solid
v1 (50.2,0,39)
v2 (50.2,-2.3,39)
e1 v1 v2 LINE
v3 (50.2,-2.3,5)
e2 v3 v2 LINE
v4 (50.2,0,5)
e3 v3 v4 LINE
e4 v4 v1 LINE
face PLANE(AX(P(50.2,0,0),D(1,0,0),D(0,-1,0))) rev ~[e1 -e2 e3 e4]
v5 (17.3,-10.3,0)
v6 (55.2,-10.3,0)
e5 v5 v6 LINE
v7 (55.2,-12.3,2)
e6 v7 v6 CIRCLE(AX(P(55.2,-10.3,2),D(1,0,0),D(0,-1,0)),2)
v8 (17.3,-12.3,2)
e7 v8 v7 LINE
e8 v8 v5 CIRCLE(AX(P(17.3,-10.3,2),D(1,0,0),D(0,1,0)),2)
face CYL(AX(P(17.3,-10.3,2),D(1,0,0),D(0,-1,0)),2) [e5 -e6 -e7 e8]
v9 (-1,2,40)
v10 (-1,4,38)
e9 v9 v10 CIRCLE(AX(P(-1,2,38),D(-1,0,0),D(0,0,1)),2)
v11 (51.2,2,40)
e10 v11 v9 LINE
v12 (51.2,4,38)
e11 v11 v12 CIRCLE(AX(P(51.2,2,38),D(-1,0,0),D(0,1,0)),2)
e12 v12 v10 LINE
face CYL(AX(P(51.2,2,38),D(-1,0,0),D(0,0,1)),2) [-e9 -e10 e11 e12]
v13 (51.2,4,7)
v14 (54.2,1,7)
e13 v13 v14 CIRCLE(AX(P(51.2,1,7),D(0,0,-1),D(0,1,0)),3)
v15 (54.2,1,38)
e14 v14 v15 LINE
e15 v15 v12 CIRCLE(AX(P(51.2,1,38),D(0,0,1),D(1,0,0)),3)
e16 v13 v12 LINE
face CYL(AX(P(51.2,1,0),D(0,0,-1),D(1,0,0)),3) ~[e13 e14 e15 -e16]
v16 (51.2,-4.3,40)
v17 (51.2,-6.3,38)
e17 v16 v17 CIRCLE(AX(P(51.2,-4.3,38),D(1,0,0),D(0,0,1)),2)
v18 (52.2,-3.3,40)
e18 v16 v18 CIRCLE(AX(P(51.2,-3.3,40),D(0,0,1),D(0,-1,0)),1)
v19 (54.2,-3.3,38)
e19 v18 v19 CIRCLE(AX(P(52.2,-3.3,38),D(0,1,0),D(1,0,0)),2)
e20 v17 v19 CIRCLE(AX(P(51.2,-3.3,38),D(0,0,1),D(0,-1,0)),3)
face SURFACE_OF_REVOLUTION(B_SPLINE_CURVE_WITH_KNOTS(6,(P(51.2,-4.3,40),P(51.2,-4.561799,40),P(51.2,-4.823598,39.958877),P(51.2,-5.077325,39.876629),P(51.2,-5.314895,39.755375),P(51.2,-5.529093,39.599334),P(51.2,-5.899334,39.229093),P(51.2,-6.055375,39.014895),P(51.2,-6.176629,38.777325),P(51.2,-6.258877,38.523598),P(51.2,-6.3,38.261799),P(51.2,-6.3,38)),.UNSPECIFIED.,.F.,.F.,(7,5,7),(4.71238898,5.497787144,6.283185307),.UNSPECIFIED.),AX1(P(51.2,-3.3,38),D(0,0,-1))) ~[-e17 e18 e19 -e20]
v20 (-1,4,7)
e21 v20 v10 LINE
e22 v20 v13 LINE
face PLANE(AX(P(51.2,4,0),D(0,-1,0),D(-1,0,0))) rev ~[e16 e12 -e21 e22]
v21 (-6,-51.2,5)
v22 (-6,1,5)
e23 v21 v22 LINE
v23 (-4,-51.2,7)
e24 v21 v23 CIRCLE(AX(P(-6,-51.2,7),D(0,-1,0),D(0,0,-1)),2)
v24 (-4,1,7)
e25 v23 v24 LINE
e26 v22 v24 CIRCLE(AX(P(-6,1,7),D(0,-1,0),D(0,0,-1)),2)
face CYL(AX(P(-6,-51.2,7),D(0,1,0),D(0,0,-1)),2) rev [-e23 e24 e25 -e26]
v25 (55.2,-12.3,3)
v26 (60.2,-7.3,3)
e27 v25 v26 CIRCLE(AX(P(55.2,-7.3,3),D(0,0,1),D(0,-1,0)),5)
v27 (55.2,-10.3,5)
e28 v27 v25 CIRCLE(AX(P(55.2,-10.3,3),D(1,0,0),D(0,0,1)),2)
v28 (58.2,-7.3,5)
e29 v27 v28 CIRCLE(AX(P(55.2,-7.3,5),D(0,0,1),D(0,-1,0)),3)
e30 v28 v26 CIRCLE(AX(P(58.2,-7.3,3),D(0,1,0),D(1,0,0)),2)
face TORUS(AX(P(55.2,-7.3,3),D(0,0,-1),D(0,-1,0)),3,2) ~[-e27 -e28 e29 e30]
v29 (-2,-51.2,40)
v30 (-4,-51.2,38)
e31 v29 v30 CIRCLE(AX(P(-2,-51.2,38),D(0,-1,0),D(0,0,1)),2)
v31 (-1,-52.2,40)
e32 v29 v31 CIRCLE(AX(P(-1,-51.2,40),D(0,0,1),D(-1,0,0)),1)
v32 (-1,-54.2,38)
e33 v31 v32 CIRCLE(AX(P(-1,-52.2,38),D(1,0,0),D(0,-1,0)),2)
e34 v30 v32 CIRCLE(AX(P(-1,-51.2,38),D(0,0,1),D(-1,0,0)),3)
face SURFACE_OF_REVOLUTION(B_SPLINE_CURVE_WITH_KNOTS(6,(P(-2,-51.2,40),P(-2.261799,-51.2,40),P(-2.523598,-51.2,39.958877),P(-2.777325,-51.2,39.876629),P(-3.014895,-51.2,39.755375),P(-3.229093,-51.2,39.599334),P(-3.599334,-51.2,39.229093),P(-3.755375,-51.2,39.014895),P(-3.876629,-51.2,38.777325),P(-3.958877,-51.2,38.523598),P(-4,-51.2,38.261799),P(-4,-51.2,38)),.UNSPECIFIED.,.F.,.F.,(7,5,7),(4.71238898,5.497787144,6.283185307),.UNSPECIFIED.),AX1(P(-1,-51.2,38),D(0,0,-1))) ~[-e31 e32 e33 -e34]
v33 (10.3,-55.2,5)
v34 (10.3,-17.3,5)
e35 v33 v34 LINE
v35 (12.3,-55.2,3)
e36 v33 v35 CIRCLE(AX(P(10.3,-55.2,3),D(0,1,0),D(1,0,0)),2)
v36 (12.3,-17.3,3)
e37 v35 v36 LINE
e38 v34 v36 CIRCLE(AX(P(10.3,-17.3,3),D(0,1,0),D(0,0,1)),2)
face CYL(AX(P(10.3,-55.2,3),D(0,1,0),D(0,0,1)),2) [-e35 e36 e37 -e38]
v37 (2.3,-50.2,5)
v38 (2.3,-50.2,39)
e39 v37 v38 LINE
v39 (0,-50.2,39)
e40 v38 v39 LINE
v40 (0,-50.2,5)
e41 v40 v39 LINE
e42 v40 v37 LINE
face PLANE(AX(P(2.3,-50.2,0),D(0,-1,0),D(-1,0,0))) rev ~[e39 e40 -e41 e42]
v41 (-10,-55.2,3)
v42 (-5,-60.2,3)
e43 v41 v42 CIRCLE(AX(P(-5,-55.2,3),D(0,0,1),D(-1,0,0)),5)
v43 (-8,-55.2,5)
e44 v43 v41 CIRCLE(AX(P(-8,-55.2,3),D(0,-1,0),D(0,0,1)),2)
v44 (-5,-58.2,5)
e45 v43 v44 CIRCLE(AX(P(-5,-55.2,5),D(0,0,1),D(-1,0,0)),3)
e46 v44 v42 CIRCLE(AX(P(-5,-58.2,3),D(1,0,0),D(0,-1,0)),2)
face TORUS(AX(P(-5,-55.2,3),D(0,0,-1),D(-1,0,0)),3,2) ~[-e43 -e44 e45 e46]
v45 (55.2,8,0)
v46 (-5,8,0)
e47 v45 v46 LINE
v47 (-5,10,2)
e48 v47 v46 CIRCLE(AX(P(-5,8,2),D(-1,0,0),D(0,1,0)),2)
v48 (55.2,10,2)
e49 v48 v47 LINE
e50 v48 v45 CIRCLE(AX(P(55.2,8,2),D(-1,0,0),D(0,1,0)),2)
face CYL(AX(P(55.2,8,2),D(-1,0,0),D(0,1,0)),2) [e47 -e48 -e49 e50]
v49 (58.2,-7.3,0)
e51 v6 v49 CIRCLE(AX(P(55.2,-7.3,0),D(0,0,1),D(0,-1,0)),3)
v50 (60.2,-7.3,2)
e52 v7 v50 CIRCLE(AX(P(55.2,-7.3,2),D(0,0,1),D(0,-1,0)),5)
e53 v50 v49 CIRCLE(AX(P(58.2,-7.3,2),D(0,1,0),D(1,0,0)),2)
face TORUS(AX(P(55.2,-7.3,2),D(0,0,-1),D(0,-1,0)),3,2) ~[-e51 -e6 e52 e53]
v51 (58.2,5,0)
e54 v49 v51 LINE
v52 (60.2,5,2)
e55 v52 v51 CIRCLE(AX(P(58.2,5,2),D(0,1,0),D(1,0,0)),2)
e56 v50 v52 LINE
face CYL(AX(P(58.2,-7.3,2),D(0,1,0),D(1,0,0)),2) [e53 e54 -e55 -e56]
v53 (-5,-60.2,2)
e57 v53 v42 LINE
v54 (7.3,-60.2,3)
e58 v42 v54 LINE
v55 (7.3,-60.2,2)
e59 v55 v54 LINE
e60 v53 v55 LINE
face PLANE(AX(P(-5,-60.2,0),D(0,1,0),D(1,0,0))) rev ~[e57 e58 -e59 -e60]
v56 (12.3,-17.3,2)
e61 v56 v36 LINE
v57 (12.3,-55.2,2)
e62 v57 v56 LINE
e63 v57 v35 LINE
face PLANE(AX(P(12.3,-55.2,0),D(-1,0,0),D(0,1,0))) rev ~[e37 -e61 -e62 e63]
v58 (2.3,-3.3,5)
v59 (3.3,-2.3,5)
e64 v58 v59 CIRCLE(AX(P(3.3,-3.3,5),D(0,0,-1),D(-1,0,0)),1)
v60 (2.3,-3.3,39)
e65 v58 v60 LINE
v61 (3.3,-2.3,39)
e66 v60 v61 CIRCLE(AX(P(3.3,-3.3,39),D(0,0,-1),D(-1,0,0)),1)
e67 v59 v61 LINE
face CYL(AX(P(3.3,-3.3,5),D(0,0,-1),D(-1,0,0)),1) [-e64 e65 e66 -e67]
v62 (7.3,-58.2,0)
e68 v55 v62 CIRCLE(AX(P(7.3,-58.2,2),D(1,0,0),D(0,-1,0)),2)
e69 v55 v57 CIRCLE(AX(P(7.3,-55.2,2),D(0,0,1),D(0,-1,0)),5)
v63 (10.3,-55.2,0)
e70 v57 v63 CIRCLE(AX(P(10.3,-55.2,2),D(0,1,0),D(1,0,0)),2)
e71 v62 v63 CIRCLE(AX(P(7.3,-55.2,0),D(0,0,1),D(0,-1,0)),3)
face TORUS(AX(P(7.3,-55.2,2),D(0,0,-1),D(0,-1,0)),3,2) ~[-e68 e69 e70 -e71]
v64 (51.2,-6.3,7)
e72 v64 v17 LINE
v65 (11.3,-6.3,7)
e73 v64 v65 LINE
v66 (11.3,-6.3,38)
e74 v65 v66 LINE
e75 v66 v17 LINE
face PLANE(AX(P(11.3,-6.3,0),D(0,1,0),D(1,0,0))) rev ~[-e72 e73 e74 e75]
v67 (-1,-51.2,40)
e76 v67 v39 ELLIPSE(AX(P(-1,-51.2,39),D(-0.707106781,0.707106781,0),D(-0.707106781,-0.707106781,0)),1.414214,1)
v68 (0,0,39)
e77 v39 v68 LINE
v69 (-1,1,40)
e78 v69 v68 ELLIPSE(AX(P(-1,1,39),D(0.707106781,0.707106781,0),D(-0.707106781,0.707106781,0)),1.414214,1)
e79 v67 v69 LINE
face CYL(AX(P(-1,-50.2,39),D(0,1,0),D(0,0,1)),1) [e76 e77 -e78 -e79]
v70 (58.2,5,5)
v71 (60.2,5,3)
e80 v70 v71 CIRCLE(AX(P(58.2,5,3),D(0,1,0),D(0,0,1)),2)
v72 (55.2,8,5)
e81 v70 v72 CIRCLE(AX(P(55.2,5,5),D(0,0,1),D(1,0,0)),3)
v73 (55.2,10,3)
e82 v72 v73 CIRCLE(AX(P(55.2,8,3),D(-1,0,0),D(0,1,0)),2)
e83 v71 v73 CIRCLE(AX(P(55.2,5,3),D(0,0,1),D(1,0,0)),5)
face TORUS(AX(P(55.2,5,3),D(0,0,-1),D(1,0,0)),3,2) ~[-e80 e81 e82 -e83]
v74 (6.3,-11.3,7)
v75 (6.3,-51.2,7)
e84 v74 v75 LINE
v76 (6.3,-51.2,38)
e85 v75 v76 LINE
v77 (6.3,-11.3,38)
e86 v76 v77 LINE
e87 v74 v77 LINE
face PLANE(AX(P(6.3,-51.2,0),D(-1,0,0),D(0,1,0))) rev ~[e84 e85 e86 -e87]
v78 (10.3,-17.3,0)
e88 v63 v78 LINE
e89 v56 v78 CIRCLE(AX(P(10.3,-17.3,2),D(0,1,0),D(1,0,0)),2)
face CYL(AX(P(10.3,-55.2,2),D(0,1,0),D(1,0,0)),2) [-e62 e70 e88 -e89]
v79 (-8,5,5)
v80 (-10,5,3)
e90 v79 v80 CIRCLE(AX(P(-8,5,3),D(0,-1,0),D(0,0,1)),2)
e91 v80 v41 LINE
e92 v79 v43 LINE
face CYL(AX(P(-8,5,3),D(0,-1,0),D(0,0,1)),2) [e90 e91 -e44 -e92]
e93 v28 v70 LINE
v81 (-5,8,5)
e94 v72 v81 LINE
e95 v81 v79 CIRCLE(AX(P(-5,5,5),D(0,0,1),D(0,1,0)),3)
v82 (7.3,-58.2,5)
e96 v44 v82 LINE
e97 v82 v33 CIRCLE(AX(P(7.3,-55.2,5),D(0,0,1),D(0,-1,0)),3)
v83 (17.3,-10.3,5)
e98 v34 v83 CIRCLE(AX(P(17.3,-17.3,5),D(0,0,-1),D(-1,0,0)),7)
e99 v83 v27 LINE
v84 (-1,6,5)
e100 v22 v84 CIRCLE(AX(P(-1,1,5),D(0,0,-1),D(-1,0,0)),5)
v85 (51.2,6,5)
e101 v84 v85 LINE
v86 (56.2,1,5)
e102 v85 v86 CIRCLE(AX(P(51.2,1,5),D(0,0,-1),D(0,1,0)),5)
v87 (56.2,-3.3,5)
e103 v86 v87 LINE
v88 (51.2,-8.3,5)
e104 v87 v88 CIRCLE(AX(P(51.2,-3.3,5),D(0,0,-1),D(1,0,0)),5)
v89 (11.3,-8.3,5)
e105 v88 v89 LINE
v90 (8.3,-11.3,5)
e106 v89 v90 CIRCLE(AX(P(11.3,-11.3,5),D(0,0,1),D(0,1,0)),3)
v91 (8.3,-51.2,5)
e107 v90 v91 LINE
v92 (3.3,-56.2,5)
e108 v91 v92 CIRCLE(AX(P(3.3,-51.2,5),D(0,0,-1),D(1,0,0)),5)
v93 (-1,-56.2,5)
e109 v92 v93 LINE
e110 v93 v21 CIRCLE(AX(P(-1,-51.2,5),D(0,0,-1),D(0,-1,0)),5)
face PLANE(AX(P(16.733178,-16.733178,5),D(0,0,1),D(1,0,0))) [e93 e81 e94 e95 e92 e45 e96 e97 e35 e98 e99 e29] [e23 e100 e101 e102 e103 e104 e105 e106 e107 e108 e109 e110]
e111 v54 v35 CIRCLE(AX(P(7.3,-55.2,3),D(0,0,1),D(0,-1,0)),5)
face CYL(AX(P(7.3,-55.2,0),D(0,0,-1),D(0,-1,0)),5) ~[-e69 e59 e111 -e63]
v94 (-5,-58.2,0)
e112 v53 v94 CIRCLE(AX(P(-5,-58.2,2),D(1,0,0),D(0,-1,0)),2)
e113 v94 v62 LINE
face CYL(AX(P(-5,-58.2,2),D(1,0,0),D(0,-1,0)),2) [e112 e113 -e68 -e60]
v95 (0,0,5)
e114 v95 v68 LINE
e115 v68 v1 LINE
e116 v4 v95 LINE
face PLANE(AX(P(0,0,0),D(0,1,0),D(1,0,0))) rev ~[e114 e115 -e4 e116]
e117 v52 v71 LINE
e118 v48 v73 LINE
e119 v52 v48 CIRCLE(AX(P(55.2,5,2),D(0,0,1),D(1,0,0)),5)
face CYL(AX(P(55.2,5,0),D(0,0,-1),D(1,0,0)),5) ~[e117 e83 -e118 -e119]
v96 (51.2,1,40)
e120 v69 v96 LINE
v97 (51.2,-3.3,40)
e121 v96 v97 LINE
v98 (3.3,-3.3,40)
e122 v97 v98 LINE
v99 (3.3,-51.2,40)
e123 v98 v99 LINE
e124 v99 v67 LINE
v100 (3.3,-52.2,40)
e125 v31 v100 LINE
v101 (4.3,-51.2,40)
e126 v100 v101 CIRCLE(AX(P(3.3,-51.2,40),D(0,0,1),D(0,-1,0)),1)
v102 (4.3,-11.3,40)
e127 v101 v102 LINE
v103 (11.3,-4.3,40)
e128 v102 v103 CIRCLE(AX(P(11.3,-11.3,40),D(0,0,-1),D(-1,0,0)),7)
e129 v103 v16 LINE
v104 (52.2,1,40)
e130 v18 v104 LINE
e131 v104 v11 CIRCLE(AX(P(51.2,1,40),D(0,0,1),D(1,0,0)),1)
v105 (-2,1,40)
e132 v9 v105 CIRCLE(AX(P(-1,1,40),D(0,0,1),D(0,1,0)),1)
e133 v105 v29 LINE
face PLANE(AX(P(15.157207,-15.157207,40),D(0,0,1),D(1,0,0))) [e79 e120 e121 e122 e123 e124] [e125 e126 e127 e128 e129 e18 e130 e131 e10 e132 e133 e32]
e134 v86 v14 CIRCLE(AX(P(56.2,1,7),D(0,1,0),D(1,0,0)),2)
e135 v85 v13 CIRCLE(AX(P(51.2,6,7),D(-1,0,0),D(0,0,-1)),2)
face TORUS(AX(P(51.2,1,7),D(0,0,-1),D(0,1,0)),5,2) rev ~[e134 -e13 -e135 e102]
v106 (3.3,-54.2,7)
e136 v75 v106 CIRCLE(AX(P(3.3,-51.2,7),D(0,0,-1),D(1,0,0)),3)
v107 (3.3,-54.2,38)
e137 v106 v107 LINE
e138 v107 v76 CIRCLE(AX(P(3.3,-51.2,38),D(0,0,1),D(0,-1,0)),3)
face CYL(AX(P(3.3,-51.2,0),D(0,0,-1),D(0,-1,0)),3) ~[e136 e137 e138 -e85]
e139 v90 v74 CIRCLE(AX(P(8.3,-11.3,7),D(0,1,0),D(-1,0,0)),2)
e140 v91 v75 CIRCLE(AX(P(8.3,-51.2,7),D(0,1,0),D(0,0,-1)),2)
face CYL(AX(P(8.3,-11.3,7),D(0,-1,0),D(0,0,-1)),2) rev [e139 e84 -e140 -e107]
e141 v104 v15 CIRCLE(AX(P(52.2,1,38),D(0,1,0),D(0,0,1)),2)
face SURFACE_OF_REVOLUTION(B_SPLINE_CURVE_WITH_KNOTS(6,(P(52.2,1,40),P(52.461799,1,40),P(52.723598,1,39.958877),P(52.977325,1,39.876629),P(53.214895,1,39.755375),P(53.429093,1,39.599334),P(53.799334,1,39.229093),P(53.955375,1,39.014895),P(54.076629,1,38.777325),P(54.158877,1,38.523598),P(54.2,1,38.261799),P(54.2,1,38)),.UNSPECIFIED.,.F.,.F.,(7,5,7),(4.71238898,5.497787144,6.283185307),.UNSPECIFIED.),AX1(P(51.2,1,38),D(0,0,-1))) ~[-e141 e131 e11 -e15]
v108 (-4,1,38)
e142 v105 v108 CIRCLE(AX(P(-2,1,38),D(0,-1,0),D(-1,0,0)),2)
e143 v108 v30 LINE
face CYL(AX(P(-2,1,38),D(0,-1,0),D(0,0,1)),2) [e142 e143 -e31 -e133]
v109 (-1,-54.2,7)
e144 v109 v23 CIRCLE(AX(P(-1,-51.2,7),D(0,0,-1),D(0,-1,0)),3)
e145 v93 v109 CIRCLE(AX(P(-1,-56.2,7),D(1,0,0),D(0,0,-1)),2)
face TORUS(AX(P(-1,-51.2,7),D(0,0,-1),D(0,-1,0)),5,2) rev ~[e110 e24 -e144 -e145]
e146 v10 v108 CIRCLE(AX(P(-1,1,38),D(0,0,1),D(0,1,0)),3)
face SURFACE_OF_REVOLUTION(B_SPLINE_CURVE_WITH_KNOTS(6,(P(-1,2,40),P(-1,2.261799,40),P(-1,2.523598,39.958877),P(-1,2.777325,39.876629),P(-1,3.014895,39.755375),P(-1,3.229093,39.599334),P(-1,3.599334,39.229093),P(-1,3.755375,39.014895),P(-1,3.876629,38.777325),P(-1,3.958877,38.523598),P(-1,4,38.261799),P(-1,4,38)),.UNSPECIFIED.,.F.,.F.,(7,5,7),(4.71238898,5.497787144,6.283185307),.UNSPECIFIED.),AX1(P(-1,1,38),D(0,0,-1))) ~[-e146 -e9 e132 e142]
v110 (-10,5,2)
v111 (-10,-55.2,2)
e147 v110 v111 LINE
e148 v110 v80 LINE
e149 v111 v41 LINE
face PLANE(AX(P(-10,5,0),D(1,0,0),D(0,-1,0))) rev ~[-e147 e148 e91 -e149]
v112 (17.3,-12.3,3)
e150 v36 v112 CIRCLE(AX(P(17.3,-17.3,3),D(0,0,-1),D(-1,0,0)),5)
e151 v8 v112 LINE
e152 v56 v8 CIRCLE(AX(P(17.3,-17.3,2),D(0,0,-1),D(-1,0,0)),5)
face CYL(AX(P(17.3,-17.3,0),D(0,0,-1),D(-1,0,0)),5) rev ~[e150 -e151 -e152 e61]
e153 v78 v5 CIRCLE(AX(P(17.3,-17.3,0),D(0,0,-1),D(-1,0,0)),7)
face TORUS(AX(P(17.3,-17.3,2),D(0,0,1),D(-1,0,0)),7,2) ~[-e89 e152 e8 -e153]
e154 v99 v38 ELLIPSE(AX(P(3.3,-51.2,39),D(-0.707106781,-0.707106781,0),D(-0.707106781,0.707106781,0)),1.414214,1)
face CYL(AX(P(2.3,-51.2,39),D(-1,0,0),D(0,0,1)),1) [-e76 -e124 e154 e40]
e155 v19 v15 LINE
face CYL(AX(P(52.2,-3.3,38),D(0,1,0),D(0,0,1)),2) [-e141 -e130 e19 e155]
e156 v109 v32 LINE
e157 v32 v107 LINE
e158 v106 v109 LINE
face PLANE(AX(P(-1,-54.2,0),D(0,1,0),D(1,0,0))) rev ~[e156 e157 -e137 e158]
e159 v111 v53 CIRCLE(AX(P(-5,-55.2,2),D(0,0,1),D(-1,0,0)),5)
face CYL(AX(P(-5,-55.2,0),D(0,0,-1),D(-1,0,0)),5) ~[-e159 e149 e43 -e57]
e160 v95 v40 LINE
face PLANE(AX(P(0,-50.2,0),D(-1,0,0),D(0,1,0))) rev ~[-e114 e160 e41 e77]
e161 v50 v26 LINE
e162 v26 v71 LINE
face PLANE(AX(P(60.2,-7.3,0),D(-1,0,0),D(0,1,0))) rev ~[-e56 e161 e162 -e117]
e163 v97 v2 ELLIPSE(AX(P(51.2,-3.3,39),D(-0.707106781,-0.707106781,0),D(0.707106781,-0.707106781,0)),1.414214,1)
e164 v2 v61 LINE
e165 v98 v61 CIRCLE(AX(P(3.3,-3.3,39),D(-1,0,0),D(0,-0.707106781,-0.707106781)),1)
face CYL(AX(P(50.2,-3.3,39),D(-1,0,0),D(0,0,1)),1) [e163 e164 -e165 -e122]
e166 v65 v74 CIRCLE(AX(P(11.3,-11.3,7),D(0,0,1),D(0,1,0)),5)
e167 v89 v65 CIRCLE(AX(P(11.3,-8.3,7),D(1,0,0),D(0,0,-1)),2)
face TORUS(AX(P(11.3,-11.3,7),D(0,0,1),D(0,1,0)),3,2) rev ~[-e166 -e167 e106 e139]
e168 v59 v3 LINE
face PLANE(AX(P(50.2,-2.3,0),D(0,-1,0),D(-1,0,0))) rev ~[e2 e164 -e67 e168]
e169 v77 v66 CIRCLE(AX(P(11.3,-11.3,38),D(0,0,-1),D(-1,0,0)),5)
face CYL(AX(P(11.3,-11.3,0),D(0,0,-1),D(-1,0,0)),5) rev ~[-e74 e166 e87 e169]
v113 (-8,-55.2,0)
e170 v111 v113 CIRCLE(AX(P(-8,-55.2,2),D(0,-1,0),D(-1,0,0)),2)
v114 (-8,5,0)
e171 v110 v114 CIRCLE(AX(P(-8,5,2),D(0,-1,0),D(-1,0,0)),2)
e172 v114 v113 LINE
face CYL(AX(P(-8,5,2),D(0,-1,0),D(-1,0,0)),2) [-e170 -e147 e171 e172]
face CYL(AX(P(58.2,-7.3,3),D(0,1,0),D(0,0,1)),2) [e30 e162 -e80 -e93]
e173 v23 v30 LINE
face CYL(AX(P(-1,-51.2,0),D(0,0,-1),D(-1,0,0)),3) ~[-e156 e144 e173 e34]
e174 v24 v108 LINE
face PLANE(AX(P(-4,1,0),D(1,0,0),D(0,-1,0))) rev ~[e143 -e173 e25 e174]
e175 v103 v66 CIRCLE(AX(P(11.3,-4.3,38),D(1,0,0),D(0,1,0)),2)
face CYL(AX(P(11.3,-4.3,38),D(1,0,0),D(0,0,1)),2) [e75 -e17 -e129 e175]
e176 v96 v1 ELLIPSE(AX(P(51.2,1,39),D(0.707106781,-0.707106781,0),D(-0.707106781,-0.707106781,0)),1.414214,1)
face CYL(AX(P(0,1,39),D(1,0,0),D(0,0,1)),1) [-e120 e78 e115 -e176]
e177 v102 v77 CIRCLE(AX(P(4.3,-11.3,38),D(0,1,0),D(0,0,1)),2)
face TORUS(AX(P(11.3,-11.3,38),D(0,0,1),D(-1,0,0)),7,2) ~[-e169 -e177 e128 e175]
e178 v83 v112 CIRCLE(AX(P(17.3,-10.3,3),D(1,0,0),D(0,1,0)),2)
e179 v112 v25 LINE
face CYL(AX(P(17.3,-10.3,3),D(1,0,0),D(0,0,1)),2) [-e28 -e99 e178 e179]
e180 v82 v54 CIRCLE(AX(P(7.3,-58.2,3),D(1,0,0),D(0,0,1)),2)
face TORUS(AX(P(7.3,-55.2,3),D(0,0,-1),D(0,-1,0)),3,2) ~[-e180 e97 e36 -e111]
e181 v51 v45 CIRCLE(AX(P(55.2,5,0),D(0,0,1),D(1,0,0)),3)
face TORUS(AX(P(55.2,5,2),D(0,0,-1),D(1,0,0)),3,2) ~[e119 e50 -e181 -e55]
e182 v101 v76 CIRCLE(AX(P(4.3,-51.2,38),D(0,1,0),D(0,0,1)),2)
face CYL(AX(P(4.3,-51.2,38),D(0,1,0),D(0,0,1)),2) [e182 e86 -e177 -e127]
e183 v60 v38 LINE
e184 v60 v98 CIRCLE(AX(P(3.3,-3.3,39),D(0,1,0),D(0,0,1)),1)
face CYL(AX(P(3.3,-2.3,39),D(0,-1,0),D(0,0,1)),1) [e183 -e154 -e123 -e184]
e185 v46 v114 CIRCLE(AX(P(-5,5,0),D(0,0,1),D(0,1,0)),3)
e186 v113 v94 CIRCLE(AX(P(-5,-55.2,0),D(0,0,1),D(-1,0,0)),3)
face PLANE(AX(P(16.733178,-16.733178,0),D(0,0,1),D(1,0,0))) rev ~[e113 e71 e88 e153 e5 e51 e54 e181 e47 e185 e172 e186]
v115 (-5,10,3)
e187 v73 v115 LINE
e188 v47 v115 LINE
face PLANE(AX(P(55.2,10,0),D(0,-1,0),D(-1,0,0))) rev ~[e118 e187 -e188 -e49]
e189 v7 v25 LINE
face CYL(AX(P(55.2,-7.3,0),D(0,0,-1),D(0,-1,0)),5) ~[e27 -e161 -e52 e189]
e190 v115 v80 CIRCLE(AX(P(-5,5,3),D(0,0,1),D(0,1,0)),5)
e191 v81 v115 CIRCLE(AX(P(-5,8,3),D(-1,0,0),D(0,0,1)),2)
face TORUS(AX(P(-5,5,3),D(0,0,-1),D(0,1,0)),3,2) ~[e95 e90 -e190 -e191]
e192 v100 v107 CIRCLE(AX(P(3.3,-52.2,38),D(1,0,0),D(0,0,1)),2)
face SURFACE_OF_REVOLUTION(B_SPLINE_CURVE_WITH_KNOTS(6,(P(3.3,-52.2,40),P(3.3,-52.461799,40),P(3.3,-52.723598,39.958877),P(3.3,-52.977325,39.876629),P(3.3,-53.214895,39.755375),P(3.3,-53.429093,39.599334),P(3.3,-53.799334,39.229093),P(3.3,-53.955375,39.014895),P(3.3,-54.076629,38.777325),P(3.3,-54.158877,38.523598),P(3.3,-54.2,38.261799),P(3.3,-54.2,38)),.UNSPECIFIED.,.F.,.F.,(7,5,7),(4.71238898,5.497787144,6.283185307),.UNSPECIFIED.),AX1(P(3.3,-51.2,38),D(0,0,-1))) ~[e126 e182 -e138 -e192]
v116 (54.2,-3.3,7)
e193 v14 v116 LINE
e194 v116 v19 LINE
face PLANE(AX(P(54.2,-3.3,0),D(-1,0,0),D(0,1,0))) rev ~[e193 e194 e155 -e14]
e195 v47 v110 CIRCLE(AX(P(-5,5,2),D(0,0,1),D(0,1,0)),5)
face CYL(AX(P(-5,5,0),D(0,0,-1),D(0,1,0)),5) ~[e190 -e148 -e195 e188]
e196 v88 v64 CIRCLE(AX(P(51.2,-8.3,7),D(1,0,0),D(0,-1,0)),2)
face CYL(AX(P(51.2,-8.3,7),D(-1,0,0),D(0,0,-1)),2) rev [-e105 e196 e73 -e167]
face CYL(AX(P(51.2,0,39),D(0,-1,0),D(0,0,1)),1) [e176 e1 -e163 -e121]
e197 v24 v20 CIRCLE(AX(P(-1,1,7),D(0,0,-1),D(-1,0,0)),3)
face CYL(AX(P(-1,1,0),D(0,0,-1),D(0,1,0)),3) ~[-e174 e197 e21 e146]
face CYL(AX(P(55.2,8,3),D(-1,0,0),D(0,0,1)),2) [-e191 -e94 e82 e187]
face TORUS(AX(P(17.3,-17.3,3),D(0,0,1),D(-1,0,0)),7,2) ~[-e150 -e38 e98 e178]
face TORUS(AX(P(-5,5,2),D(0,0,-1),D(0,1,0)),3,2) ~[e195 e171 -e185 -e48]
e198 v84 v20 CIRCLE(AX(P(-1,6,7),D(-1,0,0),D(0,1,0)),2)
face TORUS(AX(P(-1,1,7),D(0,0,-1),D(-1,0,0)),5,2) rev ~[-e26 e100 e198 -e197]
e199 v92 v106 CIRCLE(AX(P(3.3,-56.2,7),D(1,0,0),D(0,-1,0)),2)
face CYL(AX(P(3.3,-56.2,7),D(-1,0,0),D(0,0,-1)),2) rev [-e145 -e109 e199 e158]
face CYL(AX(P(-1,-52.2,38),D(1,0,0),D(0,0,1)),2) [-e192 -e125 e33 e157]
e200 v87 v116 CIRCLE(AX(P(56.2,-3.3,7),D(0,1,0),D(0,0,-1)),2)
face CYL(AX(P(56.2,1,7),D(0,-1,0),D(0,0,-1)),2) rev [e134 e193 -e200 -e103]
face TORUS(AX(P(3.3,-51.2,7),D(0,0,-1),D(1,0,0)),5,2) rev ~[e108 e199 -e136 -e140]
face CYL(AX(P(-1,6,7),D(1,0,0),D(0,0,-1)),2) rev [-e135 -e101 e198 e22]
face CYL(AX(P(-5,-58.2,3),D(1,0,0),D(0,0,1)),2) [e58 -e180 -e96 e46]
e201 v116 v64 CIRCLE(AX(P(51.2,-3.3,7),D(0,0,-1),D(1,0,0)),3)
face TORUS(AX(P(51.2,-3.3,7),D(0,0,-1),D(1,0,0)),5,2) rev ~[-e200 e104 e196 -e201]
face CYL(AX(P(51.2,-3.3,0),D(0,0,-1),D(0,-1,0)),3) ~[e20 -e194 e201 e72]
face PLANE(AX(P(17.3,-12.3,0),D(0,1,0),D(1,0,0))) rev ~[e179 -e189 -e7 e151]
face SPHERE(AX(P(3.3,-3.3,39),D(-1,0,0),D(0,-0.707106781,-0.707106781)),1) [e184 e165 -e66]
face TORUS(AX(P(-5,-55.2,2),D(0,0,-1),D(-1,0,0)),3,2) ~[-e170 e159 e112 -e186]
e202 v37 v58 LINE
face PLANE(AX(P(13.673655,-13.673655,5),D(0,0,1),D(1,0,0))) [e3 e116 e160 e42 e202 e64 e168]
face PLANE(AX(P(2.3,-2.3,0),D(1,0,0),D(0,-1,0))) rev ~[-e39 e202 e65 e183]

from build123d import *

# Parameters (mm, degrees)
F1_DEPTH    = 5
F2_DEPTH    = 40
F3_R        = 2
F4_R        = 1
F5_T1_DEPTH = 34
F5_S5_W     = 1
F5_S5_H     = 1
F5_T6_DEPTH = 1


# Not quite as in the source:
# - a fillet or chamfer that OpenCascade refuses, or shapes differently, is made with other operations: its cross-section is extruded or revolved along the edge and cut away or added


with BuildPart() as f1:
    # F0 (on Top) → F1 (new body)
    with BuildSketch(Plane.XY):
        Polygon((50.2, 0), (0, 0), (0, -50.2), (2.3, -50.2), (2.3, -2.3), (50.2, -2.3), align=None)
    extrude(amount=F1_DEPTH)



with BuildPart() as f1b:
    # F0 (on Top) → F1, piece 2 (new body)
    with BuildSketch(Plane.XY):
        with BuildLine():
            Line((55.2, 10), (-5, 10))
            ThreePointArc((-5, 10), (-8.5355339059, 8.5355339059), (-10, 5))
            Line((-10, 5), (-10, -55.2))
            ThreePointArc((-10, -55.2), (-8.5355339059, -58.7355339059), (-5, -60.2))
            Line((-5, -60.2), (7.3, -60.2))
            ThreePointArc((7.3, -60.2), (10.8355339059, -58.7355339059), (12.3, -55.2))
            Line((12.3, -55.2), (12.3, -17.3))
            ThreePointArc((12.3, -17.3), (13.7644660941, -13.7644660941), (17.3, -12.3))
            Line((17.3, -12.3), (55.2, -12.3))
            ThreePointArc((55.2, -12.3), (58.7355339059, -10.8355339059), (60.2, -7.3))
            Line((60.2, -7.3), (60.2, 5))
            ThreePointArc((60.2, 5), (58.7355339059, 8.5355339059), (55.2, 10))
        make_face()
        with BuildLine():
            ThreePointArc((51.2, 4), (53.3213203436, 3.1213203436), (54.2, 1))
            Line((54.2, 1), (54.2, -3.3))
            ThreePointArc((54.2, -3.3), (53.3213203436, -5.4213203436), (51.2, -6.3))
            Line((51.2, -6.3), (11.3, -6.3))
            ThreePointArc((11.3, -6.3), (7.7644660941, -7.7644660941), (6.3, -11.3))
            Line((6.3, -11.3), (6.3, -51.2))
            ThreePointArc((6.3, -51.2), (5.4213203436, -53.3213203436), (3.3, -54.2))
            Line((3.3, -54.2), (-1, -54.2))
            ThreePointArc((-1, -54.2), (-3.1213203436, -53.3213203436), (-4, -51.2))
            Line((-4, -51.2), (-4, 1))
            ThreePointArc((-4, 1), (-3.1213203436, 3.1213203436), (-1, 4))
            Line((-1, 4), (51.2, 4))
        make_face(mode=Mode.SUBTRACT)
    extrude(amount=F1_DEPTH)


with BuildPart() as f1_1:
    add(f1.part)

    add(f1b.part)  # F2 merges F1b
    # F0 (on Top) → F2 (join)
    with BuildSketch(Plane.XY):
        with BuildLine():
            Line((54.2, -3.3), (54.2, 1))
            ThreePointArc((54.2, 1), (53.3213203436, 3.1213203436), (51.2, 4))
            Line((51.2, 4), (-1, 4))
            ThreePointArc((-1, 4), (-3.1213203436, 3.1213203436), (-4, 1))
            Line((-4, 1), (-4, -51.2))
            ThreePointArc((-4, -51.2), (-3.1213203436, -53.3213203436), (-1, -54.2))
            Line((-1, -54.2), (3.3, -54.2))
            ThreePointArc((3.3, -54.2), (5.4213203436, -53.3213203436), (6.3, -51.2))
            Line((6.3, -51.2), (6.3, -11.3))
            ThreePointArc((6.3, -11.3), (7.7644660941, -7.7644660941), (11.3, -6.3))
            Line((11.3, -6.3), (51.2, -6.3))
            ThreePointArc((51.2, -6.3), (53.3213203436, -5.4213203436), (54.2, -3.3))
        make_face()
        Polygon((0, -50.2), (0, 0), (50.2, 0), (50.2, -2.3), (2.3, -2.3), (2.3, -50.2), align=None, mode=Mode.SUBTRACT)
    extrude(amount=F2_DEPTH)

    # F3
    f3_edges = [f1_1.edges().sort_by_distance(p)[0] for p in [
        (-4, -25.1, 5),
        (-10, -25.1, 5),
        (-10, -25.1, 0),
        (6.3, -31.25, 40),
        (36.25, -12.3, 0),
        (36.25, -12.3, 5),
        (13.764466, -13.764466, 0),
        (13.764466, -13.764466, 5),
        (58.735534, -10.835534, 0),
        (58.735534, -10.835534, 5),
        (60.2, -1.15, 0),
        (58.735534, 8.535534, 0),
        (25.1, 10, 0),
        (-8.535534, 8.535534, 0),
        (-8.535534, -58.735534, 0),
        (1.15, -60.2, 0),
        (10.835534, -58.735534, 0),
        (12.3, -36.25, 0),
        (60.2, -1.15, 5),
        (58.735534, 8.535534, 5),
        (25.1, 10, 5),
        (-8.535534, 8.535534, 5),
        (-8.535534, -58.735534, 5),
        (1.15, -60.2, 5),
        (10.835534, -58.735534, 5),
        (12.3, -36.25, 5),
        (53.32132, 3.12132, 5),
        (54.2, -1.15, 5),
        (53.32132, -5.42132, 5),
        (31.25, -6.3, 5),
        (7.764466, -7.764466, 5),
        (6.3, -31.25, 5),
        (5.42132, -53.32132, 5),
        (1.15, -54.2, 5),
        (-3.12132, -53.32132, 5),
        (-3.12132, 3.12132, 5),
        (25.1, 4, 5),
        (53.32132, 3.12132, 40),
        (54.2, -1.15, 40),
        (53.32132, -5.42132, 40),
        (31.25, -6.3, 40),
        (7.764466, -7.764466, 40),
        (5.42132, -53.32132, 40),
        (1.15, -54.2, 40),
        (-3.12132, -53.32132, 40),
        (-4, -25.1, 40),
        (-3.12132, 3.12132, 40),
        (25.1, 4, 40),
    ]]
    fillet(f3_edges, radius=F3_R)

    # F4
    f4_edges = [f1_1.edges().sort_by_distance(p)[0] for p in [
        (1.15, -50.2, 40),
        (50.2, -1.15, 40),
        (26.25, -2.3, 40),
        (2.3, -26.25, 40),
        (0, -25.1, 40),
        (25.1, 0, 40),
    ]]
    fillet(f4_edges, radius=F4_R)

    # F5: fillet of radius 1 on 1 edges, made by hand

    # F5_s2 → F5_t1 (cut)
    with BuildSketch(Plane.XY.offset(5)):
        with BuildLine():
            ThreePointArc((2.3, -3.3), (2.5928932188, -2.5928932188), (3.3, -2.3))
            Line((3.3, -2.3), (2.3, -2.3))
            Line((2.3, -2.3), (2.3, -3.3))
        make_face()
    extrude(amount=F5_T1_DEPTH, mode=Mode.SUBTRACT)


with BuildPart() as f5_tool4:
    # F5_s5 → F5_t6 (new body)
    with BuildSketch(Plane.YZ.offset(3.3)):
        with Locations((-2.8, 39.5)):
            Rectangle(F5_S5_W, F5_S5_H)
    extrude(amount=-F5_T6_DEPTH)

    # F5_s7 → F5_t8 (revolve, cut)
    with BuildSketch(Plane(origin=(3.3, -3.3, 39), x_dir=(0, -0.7071067812, -0.7071067812), z_dir=(0, 0.7071067812, -0.7071067812))):
        with BuildLine():
            ThreePointArc((0, -1), (1, 0), (0, 1))
            Line((0, 1), (0, -1))
        make_face()
    revolve(axis=Axis((3.3, -3.3, 39), (-1, 0, 0)), mode=Mode.SUBTRACT)


with BuildPart() as f1_2:
    add(f1_1.part)

    # F5_t3: cut F5_tool4
    add(f5_tool4.part, mode=Mode.SUBTRACT)


solid = f1_2.part
